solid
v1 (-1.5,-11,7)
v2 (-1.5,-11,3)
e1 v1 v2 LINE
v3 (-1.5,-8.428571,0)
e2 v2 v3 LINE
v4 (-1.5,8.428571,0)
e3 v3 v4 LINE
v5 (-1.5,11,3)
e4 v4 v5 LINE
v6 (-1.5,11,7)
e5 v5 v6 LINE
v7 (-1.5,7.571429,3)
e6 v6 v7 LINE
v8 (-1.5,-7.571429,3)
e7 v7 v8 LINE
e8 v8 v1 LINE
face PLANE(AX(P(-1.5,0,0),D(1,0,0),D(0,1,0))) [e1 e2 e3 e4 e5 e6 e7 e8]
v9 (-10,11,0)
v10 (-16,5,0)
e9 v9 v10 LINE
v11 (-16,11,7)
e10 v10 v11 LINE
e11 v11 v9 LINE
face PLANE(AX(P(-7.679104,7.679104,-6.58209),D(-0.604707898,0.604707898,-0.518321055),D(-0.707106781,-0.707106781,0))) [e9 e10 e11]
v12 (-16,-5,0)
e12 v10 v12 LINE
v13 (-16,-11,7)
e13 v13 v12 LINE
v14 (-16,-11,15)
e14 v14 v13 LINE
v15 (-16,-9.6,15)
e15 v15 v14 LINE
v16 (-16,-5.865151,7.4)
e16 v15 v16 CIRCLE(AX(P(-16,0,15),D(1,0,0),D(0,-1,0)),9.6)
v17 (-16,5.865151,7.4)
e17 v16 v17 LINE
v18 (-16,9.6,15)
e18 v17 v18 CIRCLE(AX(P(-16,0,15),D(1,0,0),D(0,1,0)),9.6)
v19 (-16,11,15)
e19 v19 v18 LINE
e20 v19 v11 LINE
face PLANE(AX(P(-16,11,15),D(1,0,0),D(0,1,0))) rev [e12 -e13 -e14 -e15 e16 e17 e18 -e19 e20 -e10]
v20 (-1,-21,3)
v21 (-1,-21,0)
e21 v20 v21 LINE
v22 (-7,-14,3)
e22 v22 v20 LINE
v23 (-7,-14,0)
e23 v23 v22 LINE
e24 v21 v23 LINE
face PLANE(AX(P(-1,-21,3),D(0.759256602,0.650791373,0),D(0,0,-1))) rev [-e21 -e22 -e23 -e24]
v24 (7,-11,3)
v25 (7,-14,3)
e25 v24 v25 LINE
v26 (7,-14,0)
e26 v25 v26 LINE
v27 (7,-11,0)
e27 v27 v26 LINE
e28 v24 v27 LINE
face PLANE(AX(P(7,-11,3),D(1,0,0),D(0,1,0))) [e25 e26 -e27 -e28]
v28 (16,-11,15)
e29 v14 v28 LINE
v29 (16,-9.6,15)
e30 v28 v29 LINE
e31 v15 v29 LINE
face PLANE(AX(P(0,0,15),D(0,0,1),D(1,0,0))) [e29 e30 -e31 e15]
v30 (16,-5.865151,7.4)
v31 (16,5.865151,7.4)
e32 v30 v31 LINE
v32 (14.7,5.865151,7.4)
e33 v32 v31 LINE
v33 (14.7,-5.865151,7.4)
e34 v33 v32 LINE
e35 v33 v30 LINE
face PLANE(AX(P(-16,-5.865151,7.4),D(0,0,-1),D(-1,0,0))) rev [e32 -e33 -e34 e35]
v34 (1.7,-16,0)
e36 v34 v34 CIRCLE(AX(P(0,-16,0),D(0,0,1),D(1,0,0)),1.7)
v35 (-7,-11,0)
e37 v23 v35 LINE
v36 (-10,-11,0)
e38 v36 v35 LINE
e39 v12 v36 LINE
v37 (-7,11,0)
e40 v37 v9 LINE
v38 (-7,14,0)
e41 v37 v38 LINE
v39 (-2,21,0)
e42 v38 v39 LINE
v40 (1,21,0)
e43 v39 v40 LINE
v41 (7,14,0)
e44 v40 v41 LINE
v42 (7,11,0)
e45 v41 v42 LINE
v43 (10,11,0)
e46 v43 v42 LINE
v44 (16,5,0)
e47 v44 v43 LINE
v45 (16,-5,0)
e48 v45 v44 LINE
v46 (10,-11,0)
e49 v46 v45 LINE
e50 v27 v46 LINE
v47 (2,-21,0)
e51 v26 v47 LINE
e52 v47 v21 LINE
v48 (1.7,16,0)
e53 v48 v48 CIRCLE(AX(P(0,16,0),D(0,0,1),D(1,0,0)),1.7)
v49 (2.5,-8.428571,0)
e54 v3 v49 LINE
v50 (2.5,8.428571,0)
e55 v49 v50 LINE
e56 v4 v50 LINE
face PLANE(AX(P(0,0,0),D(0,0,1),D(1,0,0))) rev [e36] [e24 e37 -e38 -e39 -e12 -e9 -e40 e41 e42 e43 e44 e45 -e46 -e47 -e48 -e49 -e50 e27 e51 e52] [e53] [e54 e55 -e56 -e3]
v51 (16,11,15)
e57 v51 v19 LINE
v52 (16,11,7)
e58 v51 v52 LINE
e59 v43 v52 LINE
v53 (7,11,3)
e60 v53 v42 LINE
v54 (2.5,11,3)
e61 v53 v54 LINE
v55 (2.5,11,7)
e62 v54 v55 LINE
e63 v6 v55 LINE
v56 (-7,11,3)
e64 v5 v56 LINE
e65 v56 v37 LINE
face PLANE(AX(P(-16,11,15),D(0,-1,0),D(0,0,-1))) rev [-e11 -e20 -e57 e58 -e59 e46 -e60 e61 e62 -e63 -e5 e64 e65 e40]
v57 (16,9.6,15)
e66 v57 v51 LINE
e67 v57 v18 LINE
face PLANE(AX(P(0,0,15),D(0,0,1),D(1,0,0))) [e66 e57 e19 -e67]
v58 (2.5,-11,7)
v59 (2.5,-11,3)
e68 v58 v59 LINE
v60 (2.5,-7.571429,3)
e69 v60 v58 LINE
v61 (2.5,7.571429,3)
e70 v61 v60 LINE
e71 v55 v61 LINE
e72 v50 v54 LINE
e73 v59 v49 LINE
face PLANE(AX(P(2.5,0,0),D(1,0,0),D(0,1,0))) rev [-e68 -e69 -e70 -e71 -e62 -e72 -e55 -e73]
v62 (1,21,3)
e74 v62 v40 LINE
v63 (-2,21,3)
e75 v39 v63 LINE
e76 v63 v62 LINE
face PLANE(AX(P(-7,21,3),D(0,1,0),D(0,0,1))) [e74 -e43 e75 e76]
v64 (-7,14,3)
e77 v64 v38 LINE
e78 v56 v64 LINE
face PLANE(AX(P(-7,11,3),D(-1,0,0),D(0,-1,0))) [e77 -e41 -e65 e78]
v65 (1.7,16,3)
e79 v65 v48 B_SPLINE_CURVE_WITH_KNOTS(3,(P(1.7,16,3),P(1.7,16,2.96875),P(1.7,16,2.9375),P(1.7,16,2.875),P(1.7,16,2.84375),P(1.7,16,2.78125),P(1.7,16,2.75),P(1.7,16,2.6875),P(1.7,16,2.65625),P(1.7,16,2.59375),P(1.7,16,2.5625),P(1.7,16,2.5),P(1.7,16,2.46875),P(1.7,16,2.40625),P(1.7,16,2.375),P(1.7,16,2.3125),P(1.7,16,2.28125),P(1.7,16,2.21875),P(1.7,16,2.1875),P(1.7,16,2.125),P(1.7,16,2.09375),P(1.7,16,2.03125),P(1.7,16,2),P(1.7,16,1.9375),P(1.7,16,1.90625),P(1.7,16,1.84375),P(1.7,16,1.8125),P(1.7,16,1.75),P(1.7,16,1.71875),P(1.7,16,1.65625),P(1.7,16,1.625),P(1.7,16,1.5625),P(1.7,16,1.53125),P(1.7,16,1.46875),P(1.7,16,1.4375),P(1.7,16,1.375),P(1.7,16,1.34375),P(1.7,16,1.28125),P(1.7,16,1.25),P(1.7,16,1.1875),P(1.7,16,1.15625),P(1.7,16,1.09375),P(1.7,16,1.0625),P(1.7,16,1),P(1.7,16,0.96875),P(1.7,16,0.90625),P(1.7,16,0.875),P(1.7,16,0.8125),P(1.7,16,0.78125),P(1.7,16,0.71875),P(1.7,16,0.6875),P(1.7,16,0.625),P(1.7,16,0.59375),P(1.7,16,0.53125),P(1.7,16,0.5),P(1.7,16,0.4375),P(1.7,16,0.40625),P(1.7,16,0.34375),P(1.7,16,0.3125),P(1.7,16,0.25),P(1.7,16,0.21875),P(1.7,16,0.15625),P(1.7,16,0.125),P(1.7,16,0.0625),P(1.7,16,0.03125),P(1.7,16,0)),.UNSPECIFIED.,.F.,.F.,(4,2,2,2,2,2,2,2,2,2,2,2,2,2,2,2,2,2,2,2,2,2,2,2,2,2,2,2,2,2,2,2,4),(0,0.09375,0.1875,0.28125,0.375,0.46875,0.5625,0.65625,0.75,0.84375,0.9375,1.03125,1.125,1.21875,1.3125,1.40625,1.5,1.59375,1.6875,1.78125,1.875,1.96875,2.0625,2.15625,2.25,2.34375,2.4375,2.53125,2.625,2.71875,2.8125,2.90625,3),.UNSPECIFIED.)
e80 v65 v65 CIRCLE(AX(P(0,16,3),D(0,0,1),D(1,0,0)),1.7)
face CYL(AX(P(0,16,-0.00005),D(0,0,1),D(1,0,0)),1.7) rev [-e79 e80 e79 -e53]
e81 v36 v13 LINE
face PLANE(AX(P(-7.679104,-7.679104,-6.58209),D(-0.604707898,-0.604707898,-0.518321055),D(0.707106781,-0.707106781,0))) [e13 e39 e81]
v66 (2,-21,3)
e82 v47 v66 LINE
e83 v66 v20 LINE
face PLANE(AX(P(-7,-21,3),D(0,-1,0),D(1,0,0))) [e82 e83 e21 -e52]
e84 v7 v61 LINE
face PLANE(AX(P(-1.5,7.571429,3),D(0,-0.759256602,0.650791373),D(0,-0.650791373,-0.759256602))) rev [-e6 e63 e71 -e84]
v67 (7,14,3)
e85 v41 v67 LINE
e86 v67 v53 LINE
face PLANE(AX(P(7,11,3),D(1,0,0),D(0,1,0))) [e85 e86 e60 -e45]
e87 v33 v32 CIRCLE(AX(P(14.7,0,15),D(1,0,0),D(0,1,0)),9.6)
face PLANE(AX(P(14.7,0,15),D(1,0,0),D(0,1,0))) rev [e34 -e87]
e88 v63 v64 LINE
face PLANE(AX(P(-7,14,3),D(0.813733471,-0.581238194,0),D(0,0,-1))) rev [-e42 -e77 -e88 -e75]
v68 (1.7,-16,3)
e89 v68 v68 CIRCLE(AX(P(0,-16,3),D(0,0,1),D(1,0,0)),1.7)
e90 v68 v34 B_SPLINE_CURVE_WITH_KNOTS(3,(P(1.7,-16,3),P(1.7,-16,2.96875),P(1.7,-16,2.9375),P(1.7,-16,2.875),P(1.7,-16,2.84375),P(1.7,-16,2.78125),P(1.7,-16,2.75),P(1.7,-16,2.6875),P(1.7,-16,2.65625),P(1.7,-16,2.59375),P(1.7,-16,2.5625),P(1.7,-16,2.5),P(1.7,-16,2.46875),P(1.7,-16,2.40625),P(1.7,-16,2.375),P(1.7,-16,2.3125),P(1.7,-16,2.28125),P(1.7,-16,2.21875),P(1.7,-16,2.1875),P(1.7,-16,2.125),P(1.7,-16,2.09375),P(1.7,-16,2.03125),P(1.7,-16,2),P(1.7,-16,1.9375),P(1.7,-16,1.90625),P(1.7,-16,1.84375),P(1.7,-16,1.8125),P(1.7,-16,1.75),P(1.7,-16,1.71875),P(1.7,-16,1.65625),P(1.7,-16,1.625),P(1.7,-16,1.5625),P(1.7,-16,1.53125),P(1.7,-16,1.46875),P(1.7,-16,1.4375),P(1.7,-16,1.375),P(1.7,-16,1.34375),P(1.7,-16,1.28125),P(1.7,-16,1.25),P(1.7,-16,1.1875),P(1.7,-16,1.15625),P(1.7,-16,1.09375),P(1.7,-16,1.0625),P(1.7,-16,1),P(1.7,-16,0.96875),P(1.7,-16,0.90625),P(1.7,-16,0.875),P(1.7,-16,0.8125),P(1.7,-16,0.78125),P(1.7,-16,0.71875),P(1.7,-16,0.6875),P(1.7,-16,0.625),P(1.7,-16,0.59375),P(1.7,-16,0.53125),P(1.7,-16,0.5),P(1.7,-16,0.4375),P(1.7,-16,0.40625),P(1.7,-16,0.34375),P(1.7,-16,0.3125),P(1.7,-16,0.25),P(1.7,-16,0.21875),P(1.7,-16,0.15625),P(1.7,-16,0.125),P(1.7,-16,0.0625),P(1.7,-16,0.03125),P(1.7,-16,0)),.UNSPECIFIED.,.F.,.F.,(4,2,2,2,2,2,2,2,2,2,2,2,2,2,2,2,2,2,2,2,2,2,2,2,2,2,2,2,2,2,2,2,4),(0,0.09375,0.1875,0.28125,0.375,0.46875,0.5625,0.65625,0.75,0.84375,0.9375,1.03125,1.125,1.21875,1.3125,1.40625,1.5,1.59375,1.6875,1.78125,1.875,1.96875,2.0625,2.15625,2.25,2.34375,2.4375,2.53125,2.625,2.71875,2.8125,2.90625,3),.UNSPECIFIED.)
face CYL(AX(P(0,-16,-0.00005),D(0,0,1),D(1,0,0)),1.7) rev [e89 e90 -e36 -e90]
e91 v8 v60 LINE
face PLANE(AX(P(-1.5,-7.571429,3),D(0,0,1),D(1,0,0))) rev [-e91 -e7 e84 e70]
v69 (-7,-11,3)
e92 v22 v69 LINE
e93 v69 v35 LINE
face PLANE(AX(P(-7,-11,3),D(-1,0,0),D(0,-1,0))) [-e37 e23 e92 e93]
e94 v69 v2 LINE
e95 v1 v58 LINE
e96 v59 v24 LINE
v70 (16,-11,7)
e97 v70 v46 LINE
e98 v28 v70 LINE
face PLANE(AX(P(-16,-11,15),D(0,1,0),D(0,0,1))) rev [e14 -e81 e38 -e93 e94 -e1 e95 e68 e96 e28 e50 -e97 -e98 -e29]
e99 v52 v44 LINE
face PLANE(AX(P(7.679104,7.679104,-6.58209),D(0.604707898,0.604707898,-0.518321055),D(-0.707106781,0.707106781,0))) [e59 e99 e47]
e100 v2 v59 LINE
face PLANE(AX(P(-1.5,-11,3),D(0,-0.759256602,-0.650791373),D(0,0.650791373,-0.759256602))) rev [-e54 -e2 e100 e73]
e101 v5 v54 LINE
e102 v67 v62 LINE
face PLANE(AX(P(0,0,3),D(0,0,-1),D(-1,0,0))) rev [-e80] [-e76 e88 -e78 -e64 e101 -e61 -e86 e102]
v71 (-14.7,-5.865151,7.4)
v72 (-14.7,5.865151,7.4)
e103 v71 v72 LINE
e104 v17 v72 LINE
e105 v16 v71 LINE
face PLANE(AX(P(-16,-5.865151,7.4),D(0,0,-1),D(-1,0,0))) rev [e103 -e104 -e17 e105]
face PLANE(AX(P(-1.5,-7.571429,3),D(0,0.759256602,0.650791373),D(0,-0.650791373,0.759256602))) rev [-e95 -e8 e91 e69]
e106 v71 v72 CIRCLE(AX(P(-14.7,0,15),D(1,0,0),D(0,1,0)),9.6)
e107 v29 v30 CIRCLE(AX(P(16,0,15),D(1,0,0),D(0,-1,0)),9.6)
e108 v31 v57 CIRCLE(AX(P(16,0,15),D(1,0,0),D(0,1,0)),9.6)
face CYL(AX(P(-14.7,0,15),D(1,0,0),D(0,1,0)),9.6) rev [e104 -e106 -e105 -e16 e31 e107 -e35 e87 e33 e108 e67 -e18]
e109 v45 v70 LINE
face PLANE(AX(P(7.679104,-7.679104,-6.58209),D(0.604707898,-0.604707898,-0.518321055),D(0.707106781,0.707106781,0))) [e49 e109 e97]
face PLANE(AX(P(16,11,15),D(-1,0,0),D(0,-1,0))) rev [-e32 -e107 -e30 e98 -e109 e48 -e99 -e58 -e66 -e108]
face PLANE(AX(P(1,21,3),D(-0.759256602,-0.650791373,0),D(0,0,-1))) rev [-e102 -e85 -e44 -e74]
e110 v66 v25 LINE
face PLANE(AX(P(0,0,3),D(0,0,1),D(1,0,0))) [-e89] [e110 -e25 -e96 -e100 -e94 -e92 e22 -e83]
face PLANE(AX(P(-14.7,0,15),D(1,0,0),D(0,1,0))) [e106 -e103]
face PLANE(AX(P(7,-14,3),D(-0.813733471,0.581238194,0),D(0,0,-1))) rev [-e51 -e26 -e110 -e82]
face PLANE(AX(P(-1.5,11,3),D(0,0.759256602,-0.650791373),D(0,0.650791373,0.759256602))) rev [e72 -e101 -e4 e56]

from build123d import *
from OCP.BRepFilletAPI import BRepFilletAPI_MakeChamfer
from build123d.topology import SkipClean

# Parameters (mm, degrees)
BOSS_EXTRU_1_DEPTH           = 15
ENL_V_START                  = -1.3
ESQUISSE2_R                  = 9.6
ENL_V_MAT_EXTRU_1_DEPTH      = 29.4
ENL_V_MAT_EXTRU_2_DEPTH      = 36.895542898805694
ENL_V_MAT_EXTRU_2_DEPTH_BACK = 36.895542898805694
BOSS_EXTRU_2_DEPTH           = 3
ESQUISSE6_R                  = 1.7
ENL_V_MAT_EXTRU_3_DEPTH      = 30.000000000000014
CHANFREIN1_SIZE              = 5
CHANFREIN1_SIZE2             = 7
CHANFREIN2_SIZE              = 7
CHANFREIN2_SIZE2             = 6
CHANFREIN3_START             = 12.698865856
CHANFREIN3_OUTLINE_W         = 11
CHANFREIN3_OUTLINE_H         = 12.000000000000002
CHANFREIN3_DEPTH             = 4.301134144
CHANFREIN4_START             = 12.698865856
CHANFREIN4_OUTLINE_W         = 11
CHANFREIN4_OUTLINE_H         = 12.000000000000002
CHANFREIN4_DEPTH             = 4.301134144
CHANFREIN5_START             = -17
CHANFREIN5_OUTLINE_W         = 11
CHANFREIN5_OUTLINE_H         = 12.000000000000002
CHANFREIN5_DEPTH             = 4.301134144
CHANFREIN6_START             = -17
CHANFREIN6_OUTLINE_W         = 11
CHANFREIN6_OUTLINE_H         = 12.000000000000002
CHANFREIN6_DEPTH             = 4.301134144
ENL_V_START_2                = -13.5
ENL_V_MAT_EXTRU_4_DEPTH      = 4


with BuildPart() as part:
    # Esquisse1 → Boss.-Extru.1 (new body)
    with BuildSketch(Plane.XY):
        Polygon((-16.000000000000007, 11.000000000000002), (15.999999999999993, 11.000000000000002), (15.999999999999996, -11), (-16, -11), align=None)
    extrude(amount=BOSS_EXTRU_1_DEPTH)

    # Esquisse2 → Enlèv. mat.-Extru.1 (cut)
    with BuildSketch(Plane(origin=(15.999999999999996, 2.52e-15, 0), x_dir=(0, 0, -1), z_dir=(1, 1.6e-16, 0)).offset(ENL_V_START)):
        with Locations((-15, -1.73e-15)):
            Circle(ESQUISSE2_R)
    extrude(amount=-ENL_V_MAT_EXTRU_1_DEPTH, mode=Mode.SUBTRACT)

    # Esquisse4 → Enlèv. mat.-Extru.2 (cut, two sides: drawn at the far end of the back side and taken through both)
    with SkipClean():  # the faces are left unmerged after this step: merging them gives an invalid solid
        with BuildSketch(Plane(origin=(-14.700000000000001, -2.32e-15, 0), x_dir=(0, 0, -1), z_dir=(1, 1.6e-16, 0)).offset(-ENL_V_MAT_EXTRU_2_DEPTH_BACK)):
            with BuildLine():
                Line((-7.3999999999999995, -5.865151319446073), (-7.3999999999999995, 5.865151319446073))
                ThreePointArc((-7.3999999999999995, 5.865151319446073), (-10.76593886833709, 8.615841591704243), (-15.000000000000032, 9.599999999999998))
                Line((-15.000000000000032, 9.599999999999998), (-15, -9.600000000000001))
                ThreePointArc((-15, -9.600000000000001), (-10.765938868337066, -8.615841591704251), (-7.3999999999999995, -5.865151319446073))
            make_face()
        extrude(amount=ENL_V_MAT_EXTRU_2_DEPTH + ENL_V_MAT_EXTRU_2_DEPTH_BACK, mode=Mode.SUBTRACT)

    # Esquisse5 → Boss.-Extru.2 (add)
    with BuildSketch(Plane(origin=(0, 0, 0), x_dir=(-1, 0, 0), z_dir=(0, 0, -1))):
        Polygon((7.000000000000008, -11), (-6.999999999999992, -11.000000000000002), (-6.999999999999991, -20.999999999999993), (7.000000000000009, -20.999999999999996), align=None)
        Polygon((7.000000000000006, 11.000000000000002), (-6.999999999999994, 11), (-6.999999999999992, 20.999999999999996), (7.000000000000008, 20.999999999999996), align=None)
    extrude(amount=-BOSS_EXTRU_2_DEPTH)

    # Esquisse6 → Enlèv. mat.-Extru.3 (cut, through all)
    with BuildSketch(Plane.XY.offset(3)):
        with Locations((0, -15.999999999999996)):
            Circle(ESQUISSE6_R)
        with Locations((8.7e-16, 15.999999999999996)):
            Circle(ESQUISSE6_R)
    extrude(amount=-ENL_V_MAT_EXTRU_3_DEPTH, mode=Mode.SUBTRACT)

    # Chanfrein1: one chamfer whose edges measure the first distance from different faces: ONE call of the kernel's chamfer builder (chamfer() names one face for all edges)
    chanfrein1_edges_1 = [part.edges().sort_by_distance(p)[0] for p in [
        (6.999999999999991, -20.999999999999993, 1.5),
    ]]
    chanfrein1_side_1 = [part.faces().sort_by_distance(p)[0] for p in [
        (-9.13e-15, -20.999999999999993, 1.5),
    ]]
    chanfrein1_edges_2 = [part.edges().sort_by_distance(p)[0] for p in [
        (-7.000000000000008, 20.999999999999996, 1.5),
    ]]
    chanfrein1_side_2 = [part.faces().sort_by_distance(p)[0] for p in [
        (-8.24e-15, 20.999999999999996, 1.5),
    ]]
    chanfrein1 = BRepFilletAPI_MakeChamfer(part.part.solid().wrapped)
    for e in chanfrein1_edges_1:
        chanfrein1.Add(CHANFREIN1_SIZE, CHANFREIN1_SIZE2, e.wrapped, chanfrein1_side_1[0].wrapped)  # the first distance lies on this face
    for e in chanfrein1_edges_2:
        chanfrein1.Add(CHANFREIN1_SIZE, CHANFREIN1_SIZE2, e.wrapped, chanfrein1_side_2[0].wrapped)  # the first distance lies on this face
    add(Compound.cast(chanfrein1.Shape()), mode=Mode.REPLACE)

    # Chanfrein2: one chamfer whose edges measure the first distance from different faces: ONE call of the kernel's chamfer builder (chamfer() names one face for all edges)
    chanfrein2_edges_1 = [part.edges().sort_by_distance(p)[0] for p in [
        (6.999999999999992, 20.999999999999996, 1.5),
    ]]
    chanfrein2_side_1 = [part.faces().sort_by_distance(p)[0] for p in [
        (6.999999999999993, 15.999999999999998, 1.5),
    ]]
    chanfrein2_edges_2 = [part.edges().sort_by_distance(p)[0] for p in [
        (-7.000000000000009, -20.999999999999996, 1.5),
    ]]
    chanfrein2_side_2 = [part.faces().sort_by_distance(p)[0] for p in [
        (-7.000000000000009, -15.999999999999998, 1.5),
    ]]
    chanfrein2 = BRepFilletAPI_MakeChamfer(part.part.solid().wrapped)
    for e in chanfrein2_edges_1:
        chanfrein2.Add(CHANFREIN2_SIZE, CHANFREIN2_SIZE2, e.wrapped, chanfrein2_side_1[0].wrapped)  # the first distance lies on this face
    for e in chanfrein2_edges_2:
        chanfrein2.Add(CHANFREIN2_SIZE, CHANFREIN2_SIZE2, e.wrapped, chanfrein2_side_2[0].wrapped)  # the first distance lies on this face
    add(Compound.cast(chanfrein2.Shape()), mode=Mode.REPLACE)

    # Chanfrein3: read off the stored shape, not the designer's step
    # Chanfrein3 outline → Chanfrein3 (cut)
    with BuildSketch(Plane(origin=(0, 0, 0), x_dir=(0.7964473354898962, 0.4591284639882932, 0.39353868341853704), z_dir=(0.6047078979069521, -0.6047078979069521, -0.5183210553488161)).offset(CHANFREIN3_START)):
        with Locations((6.5, 8)):
            Rectangle(CHANFREIN3_OUTLINE_W, CHANFREIN3_OUTLINE_H)
    extrude(amount=CHANFREIN3_DEPTH, mode=Mode.SUBTRACT)

    # Chanfrein4: read off the stored shape, not the designer's step
    # Chanfrein4 outline → Chanfrein4 (cut)
    with BuildSketch(Plane(origin=(0, 0, 0), x_dir=(0.7964473354898962, -0.45912846398829327, 0.39353868341853704), z_dir=(0.6047078979069521, 0.6047078979069522, -0.5183210553488161)).offset(CHANFREIN4_START)):
        with Locations((6.5, -8)):
            Rectangle(CHANFREIN4_OUTLINE_W, CHANFREIN4_OUTLINE_H)
    extrude(amount=CHANFREIN4_DEPTH, mode=Mode.SUBTRACT)

    # Chanfrein5: read off the stored shape, not the designer's step
    # Chanfrein5 outline → Chanfrein5 (cut)
    with BuildSketch(Plane(origin=(0, 0, 0), x_dir=(0.7964473354898962, 0.45912846398829327, -0.39353868341853704), z_dir=(0.6047078979069521, -0.6047078979069522, 0.5183210553488161)).offset(CHANFREIN5_START)):
        with Locations((-6.5, 8)):
            Rectangle(CHANFREIN5_OUTLINE_W, CHANFREIN5_OUTLINE_H)
    extrude(amount=CHANFREIN5_DEPTH, mode=Mode.SUBTRACT)

    # Chanfrein6: read off the stored shape, not the designer's step
    # Chanfrein6 outline → Chanfrein6 (cut)
    with BuildSketch(Plane(origin=(0, 0, 0), x_dir=(0.7964473354898959, -0.4591284639882932, -0.3935386834185371), z_dir=(0.6047078979069522, 0.6047078979069521, 0.5183210553488161)).offset(CHANFREIN6_START)):
        with Locations((-6.5, -8)):
            Rectangle(CHANFREIN6_OUTLINE_W, CHANFREIN6_OUTLINE_H)
    extrude(amount=CHANFREIN6_DEPTH, mode=Mode.SUBTRACT)

    # Esquisse7 → Enlèv. mat.-Extru.4 (cut)
    with BuildSketch(Plane(origin=(15.999999999999996, 2.52e-15, 0), x_dir=(0, 0, -1), z_dir=(1, 1.6e-16, 0)).offset(ENL_V_START_2)):
        Polygon((-3, -7.571428571428581), (-3, 7.571428571428564), (-7.000000000000009, 11), (-3.000000000000009, 11), (-4.5e-16, 8.428571428571422), (1.83e-15, -8.428571428571436), (-2.999999999999989, -11.000000000000002), (-6.9999999999999885, -11.000000000000002), align=None)
    extrude(amount=-ENL_V_MAT_EXTRU_4_DEPTH, mode=Mode.SUBTRACT)


solid = part.part
